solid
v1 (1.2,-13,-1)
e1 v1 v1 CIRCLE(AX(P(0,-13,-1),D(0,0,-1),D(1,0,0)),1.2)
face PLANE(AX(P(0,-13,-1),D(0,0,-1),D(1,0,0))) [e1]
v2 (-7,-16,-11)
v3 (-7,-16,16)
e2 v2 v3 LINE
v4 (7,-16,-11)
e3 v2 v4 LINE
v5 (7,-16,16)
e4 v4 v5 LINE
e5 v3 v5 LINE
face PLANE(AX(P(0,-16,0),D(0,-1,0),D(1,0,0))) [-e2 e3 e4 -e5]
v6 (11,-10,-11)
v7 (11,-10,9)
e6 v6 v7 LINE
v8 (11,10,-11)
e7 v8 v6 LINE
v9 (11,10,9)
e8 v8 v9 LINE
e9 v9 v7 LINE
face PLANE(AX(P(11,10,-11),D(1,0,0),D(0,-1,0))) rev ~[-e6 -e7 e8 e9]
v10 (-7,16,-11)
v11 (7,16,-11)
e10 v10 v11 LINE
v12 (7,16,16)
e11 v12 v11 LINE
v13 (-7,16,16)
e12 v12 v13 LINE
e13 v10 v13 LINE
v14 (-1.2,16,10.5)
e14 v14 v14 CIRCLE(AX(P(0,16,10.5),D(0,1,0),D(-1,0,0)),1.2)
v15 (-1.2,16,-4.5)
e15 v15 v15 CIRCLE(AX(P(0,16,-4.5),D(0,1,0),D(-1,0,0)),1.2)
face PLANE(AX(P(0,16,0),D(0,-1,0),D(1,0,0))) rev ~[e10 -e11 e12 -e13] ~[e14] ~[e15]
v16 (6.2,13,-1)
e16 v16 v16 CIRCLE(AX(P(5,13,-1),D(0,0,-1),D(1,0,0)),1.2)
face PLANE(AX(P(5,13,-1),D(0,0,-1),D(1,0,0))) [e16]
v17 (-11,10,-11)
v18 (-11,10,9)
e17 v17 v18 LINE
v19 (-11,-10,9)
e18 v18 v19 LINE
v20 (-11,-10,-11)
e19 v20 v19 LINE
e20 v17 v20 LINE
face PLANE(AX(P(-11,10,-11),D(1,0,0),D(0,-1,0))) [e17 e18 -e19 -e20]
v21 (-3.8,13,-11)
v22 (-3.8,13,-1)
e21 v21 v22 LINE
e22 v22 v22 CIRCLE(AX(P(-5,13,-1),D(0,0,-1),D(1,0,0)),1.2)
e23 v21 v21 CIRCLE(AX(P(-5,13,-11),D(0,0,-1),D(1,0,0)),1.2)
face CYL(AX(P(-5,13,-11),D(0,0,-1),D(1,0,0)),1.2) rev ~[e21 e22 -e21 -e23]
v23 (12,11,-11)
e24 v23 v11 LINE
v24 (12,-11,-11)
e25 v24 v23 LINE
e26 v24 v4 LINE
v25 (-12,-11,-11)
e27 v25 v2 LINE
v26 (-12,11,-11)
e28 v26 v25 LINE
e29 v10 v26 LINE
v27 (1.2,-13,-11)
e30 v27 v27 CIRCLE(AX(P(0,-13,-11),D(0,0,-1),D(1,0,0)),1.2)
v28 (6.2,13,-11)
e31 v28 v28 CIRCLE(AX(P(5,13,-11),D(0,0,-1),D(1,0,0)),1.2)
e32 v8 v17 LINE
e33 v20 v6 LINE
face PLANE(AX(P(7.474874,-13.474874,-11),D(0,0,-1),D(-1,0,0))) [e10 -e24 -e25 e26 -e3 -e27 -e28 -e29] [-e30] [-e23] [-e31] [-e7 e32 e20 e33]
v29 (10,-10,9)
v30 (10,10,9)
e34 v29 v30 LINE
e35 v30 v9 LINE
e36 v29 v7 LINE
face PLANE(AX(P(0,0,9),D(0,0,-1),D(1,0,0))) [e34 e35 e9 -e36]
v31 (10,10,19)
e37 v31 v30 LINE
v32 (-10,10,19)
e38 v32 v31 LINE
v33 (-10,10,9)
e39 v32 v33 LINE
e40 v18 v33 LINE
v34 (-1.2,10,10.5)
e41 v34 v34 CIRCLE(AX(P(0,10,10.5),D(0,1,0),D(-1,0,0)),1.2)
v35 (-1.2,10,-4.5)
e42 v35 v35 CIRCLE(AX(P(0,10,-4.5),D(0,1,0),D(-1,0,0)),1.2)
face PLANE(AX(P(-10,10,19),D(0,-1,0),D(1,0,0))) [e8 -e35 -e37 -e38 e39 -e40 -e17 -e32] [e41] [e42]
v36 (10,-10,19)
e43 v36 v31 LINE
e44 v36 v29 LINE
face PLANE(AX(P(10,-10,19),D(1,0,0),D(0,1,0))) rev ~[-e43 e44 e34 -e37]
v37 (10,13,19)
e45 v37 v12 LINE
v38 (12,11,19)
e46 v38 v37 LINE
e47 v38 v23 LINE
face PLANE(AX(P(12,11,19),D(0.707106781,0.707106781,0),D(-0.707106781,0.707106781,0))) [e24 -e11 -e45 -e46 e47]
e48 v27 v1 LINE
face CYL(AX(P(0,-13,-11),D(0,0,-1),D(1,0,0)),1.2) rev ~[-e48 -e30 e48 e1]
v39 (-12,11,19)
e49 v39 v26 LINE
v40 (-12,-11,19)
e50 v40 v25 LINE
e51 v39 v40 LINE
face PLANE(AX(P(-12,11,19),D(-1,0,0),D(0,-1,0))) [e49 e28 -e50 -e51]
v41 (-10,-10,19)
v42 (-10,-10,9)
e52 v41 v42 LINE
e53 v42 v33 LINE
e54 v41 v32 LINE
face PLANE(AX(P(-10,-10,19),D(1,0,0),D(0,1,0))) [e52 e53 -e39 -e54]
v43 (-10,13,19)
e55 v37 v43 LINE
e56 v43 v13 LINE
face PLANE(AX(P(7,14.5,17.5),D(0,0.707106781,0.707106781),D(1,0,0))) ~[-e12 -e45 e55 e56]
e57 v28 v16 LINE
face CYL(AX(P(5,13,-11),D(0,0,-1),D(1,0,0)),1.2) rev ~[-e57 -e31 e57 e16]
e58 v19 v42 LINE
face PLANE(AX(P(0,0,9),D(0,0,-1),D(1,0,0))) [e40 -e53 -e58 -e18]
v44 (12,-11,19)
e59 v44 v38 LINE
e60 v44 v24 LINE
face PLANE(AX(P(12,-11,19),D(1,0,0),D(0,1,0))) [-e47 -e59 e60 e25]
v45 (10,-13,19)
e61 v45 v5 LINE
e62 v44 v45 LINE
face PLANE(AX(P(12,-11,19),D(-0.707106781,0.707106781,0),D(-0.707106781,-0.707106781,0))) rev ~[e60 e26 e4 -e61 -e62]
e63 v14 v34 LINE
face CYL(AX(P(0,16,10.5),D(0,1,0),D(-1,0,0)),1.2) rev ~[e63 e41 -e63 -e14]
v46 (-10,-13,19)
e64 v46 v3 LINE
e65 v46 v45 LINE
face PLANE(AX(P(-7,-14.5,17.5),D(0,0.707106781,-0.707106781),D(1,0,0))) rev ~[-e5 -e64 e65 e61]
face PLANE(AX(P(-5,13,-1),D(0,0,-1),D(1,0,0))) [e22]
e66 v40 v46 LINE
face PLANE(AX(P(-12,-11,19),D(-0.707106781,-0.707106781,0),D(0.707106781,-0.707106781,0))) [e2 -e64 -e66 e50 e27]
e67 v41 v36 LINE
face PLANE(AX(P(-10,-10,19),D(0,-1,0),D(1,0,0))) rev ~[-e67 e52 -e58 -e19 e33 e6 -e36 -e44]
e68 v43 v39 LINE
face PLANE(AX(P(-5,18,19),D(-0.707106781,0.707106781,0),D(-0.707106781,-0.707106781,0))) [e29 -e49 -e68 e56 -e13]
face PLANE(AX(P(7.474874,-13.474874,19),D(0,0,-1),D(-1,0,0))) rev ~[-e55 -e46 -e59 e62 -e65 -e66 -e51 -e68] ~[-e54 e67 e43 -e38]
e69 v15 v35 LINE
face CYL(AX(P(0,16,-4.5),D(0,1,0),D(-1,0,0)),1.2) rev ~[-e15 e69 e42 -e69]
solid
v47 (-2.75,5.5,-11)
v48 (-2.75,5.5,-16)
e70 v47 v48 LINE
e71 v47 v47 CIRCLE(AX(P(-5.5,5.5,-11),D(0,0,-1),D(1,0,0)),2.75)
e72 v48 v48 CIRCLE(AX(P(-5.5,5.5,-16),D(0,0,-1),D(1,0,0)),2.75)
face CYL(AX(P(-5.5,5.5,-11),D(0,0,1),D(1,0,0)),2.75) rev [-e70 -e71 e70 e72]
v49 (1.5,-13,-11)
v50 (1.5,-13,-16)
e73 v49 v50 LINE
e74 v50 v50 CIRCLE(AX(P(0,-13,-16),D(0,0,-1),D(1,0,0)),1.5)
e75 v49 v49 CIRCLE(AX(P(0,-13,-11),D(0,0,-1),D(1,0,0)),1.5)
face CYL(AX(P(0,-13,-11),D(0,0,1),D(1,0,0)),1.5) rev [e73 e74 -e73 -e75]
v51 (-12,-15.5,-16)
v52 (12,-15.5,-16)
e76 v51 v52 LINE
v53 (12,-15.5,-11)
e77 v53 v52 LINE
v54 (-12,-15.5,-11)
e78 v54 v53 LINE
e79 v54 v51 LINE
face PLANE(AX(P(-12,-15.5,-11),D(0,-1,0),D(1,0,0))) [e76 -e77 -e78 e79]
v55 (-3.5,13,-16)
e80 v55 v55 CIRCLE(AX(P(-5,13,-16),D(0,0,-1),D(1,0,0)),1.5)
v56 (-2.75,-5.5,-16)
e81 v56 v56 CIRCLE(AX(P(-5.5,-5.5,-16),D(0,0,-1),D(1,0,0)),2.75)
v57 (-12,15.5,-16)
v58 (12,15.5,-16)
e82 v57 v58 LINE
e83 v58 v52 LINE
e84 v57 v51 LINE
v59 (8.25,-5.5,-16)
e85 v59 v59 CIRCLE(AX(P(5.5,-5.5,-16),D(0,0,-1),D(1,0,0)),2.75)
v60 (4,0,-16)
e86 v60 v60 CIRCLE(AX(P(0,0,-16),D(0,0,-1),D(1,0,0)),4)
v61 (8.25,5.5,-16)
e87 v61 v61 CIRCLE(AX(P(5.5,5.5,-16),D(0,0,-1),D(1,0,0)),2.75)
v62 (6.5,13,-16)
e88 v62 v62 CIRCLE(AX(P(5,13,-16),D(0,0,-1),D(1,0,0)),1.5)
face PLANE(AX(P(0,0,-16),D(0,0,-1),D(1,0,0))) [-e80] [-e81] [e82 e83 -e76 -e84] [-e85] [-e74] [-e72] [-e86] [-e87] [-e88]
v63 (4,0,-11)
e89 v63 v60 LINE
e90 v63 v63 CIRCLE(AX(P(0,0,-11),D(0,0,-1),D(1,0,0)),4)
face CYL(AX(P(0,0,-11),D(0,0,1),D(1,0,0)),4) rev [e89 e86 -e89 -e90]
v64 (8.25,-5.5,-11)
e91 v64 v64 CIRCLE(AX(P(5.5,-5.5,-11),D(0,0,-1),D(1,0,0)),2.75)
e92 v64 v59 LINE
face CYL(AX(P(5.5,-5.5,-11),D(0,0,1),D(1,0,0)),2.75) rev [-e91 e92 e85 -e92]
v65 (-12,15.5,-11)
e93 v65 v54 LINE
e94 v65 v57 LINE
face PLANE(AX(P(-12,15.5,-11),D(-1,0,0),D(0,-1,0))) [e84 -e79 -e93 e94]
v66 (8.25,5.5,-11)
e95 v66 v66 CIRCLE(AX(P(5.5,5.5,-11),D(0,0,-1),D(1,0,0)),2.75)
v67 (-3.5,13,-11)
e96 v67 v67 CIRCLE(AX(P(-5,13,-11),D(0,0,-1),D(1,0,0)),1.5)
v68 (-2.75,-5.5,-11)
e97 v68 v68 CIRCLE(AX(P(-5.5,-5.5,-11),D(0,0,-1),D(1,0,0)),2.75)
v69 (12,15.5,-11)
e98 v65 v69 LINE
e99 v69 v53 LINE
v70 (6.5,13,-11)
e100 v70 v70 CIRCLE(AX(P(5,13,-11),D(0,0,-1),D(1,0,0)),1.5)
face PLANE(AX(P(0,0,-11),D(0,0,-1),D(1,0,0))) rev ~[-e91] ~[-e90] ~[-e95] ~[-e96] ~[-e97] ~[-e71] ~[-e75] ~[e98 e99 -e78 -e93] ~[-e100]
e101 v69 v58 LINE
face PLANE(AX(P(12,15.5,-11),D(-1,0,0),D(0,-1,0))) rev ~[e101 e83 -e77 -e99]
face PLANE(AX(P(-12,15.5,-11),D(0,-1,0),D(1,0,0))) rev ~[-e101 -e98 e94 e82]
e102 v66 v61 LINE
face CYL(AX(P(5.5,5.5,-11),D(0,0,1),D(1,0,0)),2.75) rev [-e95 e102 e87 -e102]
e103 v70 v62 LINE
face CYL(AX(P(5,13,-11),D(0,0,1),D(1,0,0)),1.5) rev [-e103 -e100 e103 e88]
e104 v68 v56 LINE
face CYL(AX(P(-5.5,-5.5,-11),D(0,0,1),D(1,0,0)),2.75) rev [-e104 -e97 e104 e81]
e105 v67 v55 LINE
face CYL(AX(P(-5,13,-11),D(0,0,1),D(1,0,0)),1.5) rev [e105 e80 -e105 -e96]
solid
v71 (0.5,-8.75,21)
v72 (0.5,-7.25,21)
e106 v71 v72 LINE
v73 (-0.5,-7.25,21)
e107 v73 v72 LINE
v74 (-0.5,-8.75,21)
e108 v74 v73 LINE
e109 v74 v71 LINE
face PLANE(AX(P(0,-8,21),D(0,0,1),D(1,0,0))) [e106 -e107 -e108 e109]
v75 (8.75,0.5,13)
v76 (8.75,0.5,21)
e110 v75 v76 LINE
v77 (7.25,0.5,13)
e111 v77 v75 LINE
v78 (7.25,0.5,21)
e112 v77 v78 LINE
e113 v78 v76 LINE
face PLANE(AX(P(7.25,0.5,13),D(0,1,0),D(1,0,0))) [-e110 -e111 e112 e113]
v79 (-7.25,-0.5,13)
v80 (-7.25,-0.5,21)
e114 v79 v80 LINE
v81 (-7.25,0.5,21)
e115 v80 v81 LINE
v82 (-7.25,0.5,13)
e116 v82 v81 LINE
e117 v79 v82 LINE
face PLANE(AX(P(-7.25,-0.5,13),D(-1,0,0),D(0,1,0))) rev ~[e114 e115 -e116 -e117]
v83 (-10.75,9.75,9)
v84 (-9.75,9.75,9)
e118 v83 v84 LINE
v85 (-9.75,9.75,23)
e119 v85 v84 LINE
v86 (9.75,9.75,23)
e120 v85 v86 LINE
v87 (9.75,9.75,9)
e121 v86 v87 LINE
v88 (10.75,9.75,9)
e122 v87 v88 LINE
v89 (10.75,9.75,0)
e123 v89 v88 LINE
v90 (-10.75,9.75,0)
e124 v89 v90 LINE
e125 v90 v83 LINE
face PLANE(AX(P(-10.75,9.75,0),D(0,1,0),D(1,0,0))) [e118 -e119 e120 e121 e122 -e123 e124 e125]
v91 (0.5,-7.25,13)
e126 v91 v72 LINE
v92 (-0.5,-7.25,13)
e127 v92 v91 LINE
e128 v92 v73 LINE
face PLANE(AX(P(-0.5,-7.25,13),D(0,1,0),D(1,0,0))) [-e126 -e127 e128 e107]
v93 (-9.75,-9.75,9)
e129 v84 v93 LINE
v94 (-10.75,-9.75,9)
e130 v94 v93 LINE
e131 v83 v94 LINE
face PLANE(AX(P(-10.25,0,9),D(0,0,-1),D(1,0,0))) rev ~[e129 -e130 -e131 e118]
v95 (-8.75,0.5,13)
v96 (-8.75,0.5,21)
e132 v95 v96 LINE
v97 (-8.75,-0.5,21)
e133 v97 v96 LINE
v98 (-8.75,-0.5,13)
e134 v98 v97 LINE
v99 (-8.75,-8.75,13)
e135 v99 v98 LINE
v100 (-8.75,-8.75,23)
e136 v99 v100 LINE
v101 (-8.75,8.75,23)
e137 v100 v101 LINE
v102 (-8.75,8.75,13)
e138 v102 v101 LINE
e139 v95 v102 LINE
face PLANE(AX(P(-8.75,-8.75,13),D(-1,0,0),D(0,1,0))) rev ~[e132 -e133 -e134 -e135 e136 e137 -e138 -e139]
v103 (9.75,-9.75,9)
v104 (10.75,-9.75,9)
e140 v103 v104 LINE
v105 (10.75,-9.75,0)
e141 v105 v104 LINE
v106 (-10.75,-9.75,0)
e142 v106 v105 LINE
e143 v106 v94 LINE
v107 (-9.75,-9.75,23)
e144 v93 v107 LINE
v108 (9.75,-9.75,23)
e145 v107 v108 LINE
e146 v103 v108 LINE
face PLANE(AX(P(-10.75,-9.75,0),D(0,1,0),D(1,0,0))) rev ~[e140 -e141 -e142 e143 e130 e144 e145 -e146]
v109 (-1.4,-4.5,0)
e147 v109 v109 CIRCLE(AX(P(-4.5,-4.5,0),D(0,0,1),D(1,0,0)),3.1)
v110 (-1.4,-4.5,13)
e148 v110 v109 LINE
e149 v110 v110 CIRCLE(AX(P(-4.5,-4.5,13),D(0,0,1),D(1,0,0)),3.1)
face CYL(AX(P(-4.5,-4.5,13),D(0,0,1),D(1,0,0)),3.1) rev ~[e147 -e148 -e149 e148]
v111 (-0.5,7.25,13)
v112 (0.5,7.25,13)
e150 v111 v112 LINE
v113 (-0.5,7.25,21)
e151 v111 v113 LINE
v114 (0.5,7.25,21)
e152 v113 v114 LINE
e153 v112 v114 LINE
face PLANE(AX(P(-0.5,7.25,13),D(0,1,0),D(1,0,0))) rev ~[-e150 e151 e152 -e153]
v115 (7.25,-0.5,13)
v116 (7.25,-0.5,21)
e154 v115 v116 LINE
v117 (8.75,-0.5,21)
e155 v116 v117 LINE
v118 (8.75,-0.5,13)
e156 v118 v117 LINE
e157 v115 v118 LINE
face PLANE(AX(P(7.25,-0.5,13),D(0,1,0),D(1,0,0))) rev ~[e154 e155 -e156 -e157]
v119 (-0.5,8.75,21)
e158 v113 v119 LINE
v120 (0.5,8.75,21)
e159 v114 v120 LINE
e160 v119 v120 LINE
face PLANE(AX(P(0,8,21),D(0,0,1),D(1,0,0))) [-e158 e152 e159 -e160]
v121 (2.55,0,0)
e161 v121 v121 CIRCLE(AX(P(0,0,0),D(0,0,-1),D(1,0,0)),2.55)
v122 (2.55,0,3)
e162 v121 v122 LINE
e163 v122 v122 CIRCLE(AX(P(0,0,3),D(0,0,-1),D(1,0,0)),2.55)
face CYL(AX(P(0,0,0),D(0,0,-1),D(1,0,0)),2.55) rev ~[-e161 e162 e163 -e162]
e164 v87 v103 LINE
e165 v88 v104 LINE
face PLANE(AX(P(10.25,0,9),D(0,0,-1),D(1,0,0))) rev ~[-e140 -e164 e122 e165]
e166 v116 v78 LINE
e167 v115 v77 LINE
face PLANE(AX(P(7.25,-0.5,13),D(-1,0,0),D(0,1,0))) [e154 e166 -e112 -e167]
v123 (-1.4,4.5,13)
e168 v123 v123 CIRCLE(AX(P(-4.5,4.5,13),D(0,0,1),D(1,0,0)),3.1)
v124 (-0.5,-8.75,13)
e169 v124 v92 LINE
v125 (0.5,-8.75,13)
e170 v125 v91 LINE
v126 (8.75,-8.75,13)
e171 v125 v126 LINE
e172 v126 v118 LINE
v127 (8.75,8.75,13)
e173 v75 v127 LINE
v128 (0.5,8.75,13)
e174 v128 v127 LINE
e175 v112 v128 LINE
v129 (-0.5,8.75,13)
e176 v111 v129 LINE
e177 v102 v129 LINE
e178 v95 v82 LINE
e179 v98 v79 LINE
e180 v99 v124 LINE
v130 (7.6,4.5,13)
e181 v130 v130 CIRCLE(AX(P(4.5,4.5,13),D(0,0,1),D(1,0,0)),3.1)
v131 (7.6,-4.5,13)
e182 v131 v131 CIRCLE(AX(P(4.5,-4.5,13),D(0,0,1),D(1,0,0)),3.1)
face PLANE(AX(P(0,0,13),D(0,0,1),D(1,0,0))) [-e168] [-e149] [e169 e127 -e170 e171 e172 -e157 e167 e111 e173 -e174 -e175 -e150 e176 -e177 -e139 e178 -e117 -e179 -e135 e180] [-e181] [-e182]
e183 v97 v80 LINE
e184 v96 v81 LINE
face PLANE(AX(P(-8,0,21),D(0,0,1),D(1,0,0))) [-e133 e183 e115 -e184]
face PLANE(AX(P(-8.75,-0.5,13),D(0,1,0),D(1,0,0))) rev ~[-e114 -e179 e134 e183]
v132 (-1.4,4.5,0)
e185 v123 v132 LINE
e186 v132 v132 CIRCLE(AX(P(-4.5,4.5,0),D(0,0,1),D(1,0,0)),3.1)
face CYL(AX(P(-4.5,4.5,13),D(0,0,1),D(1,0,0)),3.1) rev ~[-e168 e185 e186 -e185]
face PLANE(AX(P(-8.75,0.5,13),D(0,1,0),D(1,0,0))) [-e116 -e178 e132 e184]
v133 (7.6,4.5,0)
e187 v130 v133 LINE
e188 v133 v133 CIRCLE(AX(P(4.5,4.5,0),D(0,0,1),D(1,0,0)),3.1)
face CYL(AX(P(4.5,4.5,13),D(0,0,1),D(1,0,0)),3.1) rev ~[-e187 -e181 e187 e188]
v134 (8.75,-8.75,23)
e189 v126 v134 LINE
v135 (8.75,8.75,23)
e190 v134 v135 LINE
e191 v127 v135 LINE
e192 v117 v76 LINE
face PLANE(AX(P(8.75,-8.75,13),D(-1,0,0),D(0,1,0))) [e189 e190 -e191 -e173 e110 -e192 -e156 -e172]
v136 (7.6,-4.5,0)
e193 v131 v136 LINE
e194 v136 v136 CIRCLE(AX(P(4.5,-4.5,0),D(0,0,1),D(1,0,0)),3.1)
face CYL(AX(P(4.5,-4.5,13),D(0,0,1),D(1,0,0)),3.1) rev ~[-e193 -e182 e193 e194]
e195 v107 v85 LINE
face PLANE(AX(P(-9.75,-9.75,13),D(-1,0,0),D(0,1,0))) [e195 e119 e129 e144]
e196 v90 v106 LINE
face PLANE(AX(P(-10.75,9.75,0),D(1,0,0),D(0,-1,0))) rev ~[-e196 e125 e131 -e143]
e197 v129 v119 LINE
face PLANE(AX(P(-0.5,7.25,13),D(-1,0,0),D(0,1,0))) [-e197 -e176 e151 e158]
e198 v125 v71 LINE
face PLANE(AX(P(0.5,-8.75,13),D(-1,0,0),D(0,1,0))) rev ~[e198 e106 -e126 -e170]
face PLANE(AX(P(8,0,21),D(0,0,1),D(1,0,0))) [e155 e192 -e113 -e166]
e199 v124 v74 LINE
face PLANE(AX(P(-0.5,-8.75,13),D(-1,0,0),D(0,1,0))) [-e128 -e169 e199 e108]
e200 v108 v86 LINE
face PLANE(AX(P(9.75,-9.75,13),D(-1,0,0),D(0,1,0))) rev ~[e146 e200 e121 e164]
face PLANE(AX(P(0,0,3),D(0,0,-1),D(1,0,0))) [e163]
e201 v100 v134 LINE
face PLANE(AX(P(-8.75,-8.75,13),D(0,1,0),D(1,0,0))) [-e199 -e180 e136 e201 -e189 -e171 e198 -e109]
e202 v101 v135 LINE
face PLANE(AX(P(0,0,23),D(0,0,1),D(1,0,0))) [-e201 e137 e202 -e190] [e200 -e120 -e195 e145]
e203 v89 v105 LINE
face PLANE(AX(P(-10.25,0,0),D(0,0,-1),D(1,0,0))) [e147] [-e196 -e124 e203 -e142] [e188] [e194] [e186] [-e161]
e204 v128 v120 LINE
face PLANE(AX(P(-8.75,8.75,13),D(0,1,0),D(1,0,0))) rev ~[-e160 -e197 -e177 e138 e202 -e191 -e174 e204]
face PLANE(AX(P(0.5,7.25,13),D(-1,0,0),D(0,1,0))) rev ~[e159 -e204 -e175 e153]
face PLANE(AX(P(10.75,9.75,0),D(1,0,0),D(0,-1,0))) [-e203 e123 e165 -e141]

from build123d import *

# Parameters (mm, degrees)
F0_W          = 19.5
F0_H          = 19.5
F1_DEPTH      = 13
F2_W          = 19.5
F2_H          = 19.5
F2_W_2        = 17.5
F2_H_2        = 17.5
F3_DEPTH      = 10
F4_W          = 1
F4_H          = 1.5
F4_W_2        = 1.5
F4_H_2        = 1
F5_DEPTH      = 8
F6_R          = 3.1
F7_DEPTH      = 19
F8_W          = 1
F8_H          = 19.5
F9_DEPTH      = 9
F10_R         = 2.55
F11_DEPTH     = 3
F13_W         = 20
F13_H         = 20
F13_W_2       = 10
F13_H_2       = 5
F14_DEPTH     = 30
F15_W         = 22
F15_H         = 20
F16_DEPTH     = 20
F17_R         = 1.2
F18_DEPTH     = 6
F19_T4_DEPTH  = 30
F19_T10_DEPTH = 30
F19_T16_DEPTH = 30
F19_T22_DEPTH = 30
F20_R         = 1.2
F21_DEPTH     = 10
F23_W         = 24
F23_H         = 31
F23_R         = 1.5
F23_R_2       = 2.75
F23_R_3       = 4
F24_DEPTH     = 5
F25_SIZE      = 3


# Not quite as in the source:
# - a fillet or chamfer that OpenCascade refuses, or shapes differently, is made with other operations: its cross-section is extruded or revolved along the edge and cut away or added


with BuildPart() as f1:
    # F0 (on Top) → F1 (new body)
    with BuildSketch(Plane.XY):
        Rectangle(F0_W, F0_H)
    extrude(amount=F1_DEPTH)

    # F2 (on face) → F3 (join)
    with BuildSketch(Plane.XY.offset(13)):
        Rectangle(F2_W, F2_H)
        Rectangle(F2_W_2, F2_H_2, mode=Mode.SUBTRACT)
    extrude(amount=F3_DEPTH)

    # F4 (on face) → F5 (join)
    with BuildSketch(Plane.XY.offset(13)):
        with Locations((0, 8)):
            Rectangle(F4_W, F4_H)
        with Locations((0, -8)):
            Rectangle(F4_W, F4_H)
        with Locations((-8, 0)):
            Rectangle(F4_W_2, F4_H_2)
        with Locations((8, 0)):
            Rectangle(F4_W_2, F4_H_2)
    extrude(amount=F5_DEPTH)

    # F6 (on face) → F7 (cut)
    with BuildSketch(Plane.XY.offset(13)):
        with Locations((-4.5, 4.5)):
            Circle(F6_R)
        with Locations((-4.5, -4.5)):
            Circle(F6_R)
        with Locations((4.5, 4.5)):
            Circle(F6_R)
        with Locations((4.5, -4.5)):
            Circle(F6_R)
    extrude(amount=-F7_DEPTH, mode=Mode.SUBTRACT)

    # F8 (on face) → F9 (join)
    with BuildSketch(Plane(origin=(0, 0, 0), x_dir=(1, 0, 0), z_dir=(0, 0, -1))):
        with Locations((-10.25, 0)):
            Rectangle(F8_W, F8_H)
        with Locations((10.25, 0)):
            Rectangle(F8_W, F8_H)
    extrude(amount=-F9_DEPTH)

    # F10 (on face) → F11 (cut)
    with BuildSketch(Plane(origin=(0, 0, 0), x_dir=(1, 0, 0), z_dir=(0, 0, -1))):
        Circle(F10_R)
    extrude(amount=-F11_DEPTH, mode=Mode.SUBTRACT)


with BuildPart() as f14:
    # F13 (on offset) → F14 (new body)
    with BuildSketch(Plane.XY.offset(19)):
        Polygon((5, -11), (12, -11), (12, 11), (5, 11), (-5, 11), (-12, 11), (-12, -11), (-5, -11), align=None)
        Rectangle(F13_W, F13_H, mode=Mode.SUBTRACT)
        with Locations((0, -13.5)):
            Rectangle(F13_W_2, F13_H_2)
        with Locations((0, 13.5)):
            Rectangle(F13_W_2, F13_H_2)
    extrude(amount=-F14_DEPTH)

    # F15 (on face) → F16 (cut)
    with BuildSketch(Plane(origin=(0, 0, -11), x_dir=(1, 0, 0), z_dir=(0, 0, -1))):
        Rectangle(F15_W, F15_H)
    extrude(amount=-F16_DEPTH, mode=Mode.SUBTRACT)

    # F17 (on face) → F18 (cut)
    with BuildSketch(Plane(origin=(0, 16, 0), x_dir=(-1, 0, 0), z_dir=(0, 1, 0))):
        with Locations((0, 10.5)):
            Circle(F17_R)
        with Locations((0, -4.5)):
            Circle(F17_R)
    extrude(amount=-F18_DEPTH, mode=Mode.SUBTRACT)

    # F19: chamfer of 7 on 4 edges, made by hand


with BuildPart() as f19_tool2:
    # F19_s3 → F19_t4 (new body)
    with BuildSketch(Plane.XY.offset(19)):
        Polygon((12, 11), (5, 18), (5, 11), align=None)
    extrude(amount=-F19_T4_DEPTH)

    split(bisect_by=Plane.YZ.offset(12), keep=Keep.BOTTOM)

    split(bisect_by=Plane.XZ.offset(-16), keep=Keep.TOP)


with BuildPart() as f14_1:
    add(f14.part)

    # F19_t1: union F19_tool2
    add(f19_tool2.part)


with BuildPart() as f19_tool8:
    # F19_s9 → F19_t10 (new body)
    with BuildSketch(Plane.XY.offset(19)):
        Polygon((-5, 18), (-12, 11), (-5, 11), align=None)
    extrude(amount=-F19_T10_DEPTH)

    split(bisect_by=Plane.XZ.offset(-16), keep=Keep.TOP)

    split(bisect_by=Plane.YZ.offset(-12), keep=Keep.TOP)


with BuildPart() as f14_2:
    add(f14_1.part)

    # F19_t7: union F19_tool8
    add(f19_tool8.part)


with BuildPart() as f19_tool14:
    # F19_s15 → F19_t16 (new body)
    with BuildSketch(Plane.XY.offset(19)):
        Polygon((-12, -11), (-5, -18), (-5, -11), align=None)
    extrude(amount=-F19_T16_DEPTH)

    split(bisect_by=Plane.XZ.offset(16), keep=Keep.BOTTOM)

    split(bisect_by=Plane.YZ.offset(-12), keep=Keep.TOP)


with BuildPart() as f14_3:
    add(f14_2.part)

    # F19_t13: union F19_tool14
    add(f19_tool14.part)


with BuildPart() as f19_tool20:
    # F19_s21 → F19_t22 (new body)
    with BuildSketch(Plane.XY.offset(19)):
        Polygon((12, -11), (5, -18), (5, -11), align=None)
    extrude(amount=-F19_T22_DEPTH)

    split(bisect_by=Plane.YZ.offset(12), keep=Keep.BOTTOM)

    split(bisect_by=Plane.XZ.offset(16), keep=Keep.BOTTOM)


with BuildPart() as f14_4:
    add(f14_3.part)

    # F19_t19: union F19_tool20
    add(f19_tool20.part)

    # F20 (on face) → F21 (cut)
    with BuildSketch(Plane(origin=(0, 0, -11), x_dir=(1, 0, 0), z_dir=(0, 0, -1))):
        with Locations((0, 13)):
            Circle(F20_R)
        with Locations((-5, -13)):
            Circle(F20_R)
        with Locations((5, -13)):
            Circle(F20_R)
    extrude(amount=-F21_DEPTH, mode=Mode.SUBTRACT)

    # F25
    f25_edges = [f14_4.edges().sort_by_distance(p)[0] for p in [
        (0, 16, 19),
        (0, -16, 19),
    ]]
    chamfer(f25_edges, length=F25_SIZE)


with BuildPart() as f24:
    # F23 (on offset) → F24 (new body)
    with BuildSketch(Plane(origin=(0, 0, -11), x_dir=(1, 0, 0), z_dir=(0, 0, -1))):
        Rectangle(F23_W, F23_H)
        with Locations((-5, -13)):
            Circle(F23_R, mode=Mode.SUBTRACT)
        with Locations((-5.5, -5.5)):
            Circle(F23_R_2, mode=Mode.SUBTRACT)
        with Locations((5, -13)):
            Circle(F23_R, mode=Mode.SUBTRACT)
        with Locations((5.5, -5.5)):
            Circle(F23_R_2, mode=Mode.SUBTRACT)
        with Locations((-5.5, 5.5)):
            Circle(F23_R_2, mode=Mode.SUBTRACT)
        Circle(F23_R_3, mode=Mode.SUBTRACT)
        with Locations((5.5, 5.5)):
            Circle(F23_R_2, mode=Mode.SUBTRACT)
        with Locations((0, 13)):
            Circle(F23_R, mode=Mode.SUBTRACT)
    extrude(amount=F24_DEPTH)


solid = Compound([f1.part, f14_4.part, f24.part])
